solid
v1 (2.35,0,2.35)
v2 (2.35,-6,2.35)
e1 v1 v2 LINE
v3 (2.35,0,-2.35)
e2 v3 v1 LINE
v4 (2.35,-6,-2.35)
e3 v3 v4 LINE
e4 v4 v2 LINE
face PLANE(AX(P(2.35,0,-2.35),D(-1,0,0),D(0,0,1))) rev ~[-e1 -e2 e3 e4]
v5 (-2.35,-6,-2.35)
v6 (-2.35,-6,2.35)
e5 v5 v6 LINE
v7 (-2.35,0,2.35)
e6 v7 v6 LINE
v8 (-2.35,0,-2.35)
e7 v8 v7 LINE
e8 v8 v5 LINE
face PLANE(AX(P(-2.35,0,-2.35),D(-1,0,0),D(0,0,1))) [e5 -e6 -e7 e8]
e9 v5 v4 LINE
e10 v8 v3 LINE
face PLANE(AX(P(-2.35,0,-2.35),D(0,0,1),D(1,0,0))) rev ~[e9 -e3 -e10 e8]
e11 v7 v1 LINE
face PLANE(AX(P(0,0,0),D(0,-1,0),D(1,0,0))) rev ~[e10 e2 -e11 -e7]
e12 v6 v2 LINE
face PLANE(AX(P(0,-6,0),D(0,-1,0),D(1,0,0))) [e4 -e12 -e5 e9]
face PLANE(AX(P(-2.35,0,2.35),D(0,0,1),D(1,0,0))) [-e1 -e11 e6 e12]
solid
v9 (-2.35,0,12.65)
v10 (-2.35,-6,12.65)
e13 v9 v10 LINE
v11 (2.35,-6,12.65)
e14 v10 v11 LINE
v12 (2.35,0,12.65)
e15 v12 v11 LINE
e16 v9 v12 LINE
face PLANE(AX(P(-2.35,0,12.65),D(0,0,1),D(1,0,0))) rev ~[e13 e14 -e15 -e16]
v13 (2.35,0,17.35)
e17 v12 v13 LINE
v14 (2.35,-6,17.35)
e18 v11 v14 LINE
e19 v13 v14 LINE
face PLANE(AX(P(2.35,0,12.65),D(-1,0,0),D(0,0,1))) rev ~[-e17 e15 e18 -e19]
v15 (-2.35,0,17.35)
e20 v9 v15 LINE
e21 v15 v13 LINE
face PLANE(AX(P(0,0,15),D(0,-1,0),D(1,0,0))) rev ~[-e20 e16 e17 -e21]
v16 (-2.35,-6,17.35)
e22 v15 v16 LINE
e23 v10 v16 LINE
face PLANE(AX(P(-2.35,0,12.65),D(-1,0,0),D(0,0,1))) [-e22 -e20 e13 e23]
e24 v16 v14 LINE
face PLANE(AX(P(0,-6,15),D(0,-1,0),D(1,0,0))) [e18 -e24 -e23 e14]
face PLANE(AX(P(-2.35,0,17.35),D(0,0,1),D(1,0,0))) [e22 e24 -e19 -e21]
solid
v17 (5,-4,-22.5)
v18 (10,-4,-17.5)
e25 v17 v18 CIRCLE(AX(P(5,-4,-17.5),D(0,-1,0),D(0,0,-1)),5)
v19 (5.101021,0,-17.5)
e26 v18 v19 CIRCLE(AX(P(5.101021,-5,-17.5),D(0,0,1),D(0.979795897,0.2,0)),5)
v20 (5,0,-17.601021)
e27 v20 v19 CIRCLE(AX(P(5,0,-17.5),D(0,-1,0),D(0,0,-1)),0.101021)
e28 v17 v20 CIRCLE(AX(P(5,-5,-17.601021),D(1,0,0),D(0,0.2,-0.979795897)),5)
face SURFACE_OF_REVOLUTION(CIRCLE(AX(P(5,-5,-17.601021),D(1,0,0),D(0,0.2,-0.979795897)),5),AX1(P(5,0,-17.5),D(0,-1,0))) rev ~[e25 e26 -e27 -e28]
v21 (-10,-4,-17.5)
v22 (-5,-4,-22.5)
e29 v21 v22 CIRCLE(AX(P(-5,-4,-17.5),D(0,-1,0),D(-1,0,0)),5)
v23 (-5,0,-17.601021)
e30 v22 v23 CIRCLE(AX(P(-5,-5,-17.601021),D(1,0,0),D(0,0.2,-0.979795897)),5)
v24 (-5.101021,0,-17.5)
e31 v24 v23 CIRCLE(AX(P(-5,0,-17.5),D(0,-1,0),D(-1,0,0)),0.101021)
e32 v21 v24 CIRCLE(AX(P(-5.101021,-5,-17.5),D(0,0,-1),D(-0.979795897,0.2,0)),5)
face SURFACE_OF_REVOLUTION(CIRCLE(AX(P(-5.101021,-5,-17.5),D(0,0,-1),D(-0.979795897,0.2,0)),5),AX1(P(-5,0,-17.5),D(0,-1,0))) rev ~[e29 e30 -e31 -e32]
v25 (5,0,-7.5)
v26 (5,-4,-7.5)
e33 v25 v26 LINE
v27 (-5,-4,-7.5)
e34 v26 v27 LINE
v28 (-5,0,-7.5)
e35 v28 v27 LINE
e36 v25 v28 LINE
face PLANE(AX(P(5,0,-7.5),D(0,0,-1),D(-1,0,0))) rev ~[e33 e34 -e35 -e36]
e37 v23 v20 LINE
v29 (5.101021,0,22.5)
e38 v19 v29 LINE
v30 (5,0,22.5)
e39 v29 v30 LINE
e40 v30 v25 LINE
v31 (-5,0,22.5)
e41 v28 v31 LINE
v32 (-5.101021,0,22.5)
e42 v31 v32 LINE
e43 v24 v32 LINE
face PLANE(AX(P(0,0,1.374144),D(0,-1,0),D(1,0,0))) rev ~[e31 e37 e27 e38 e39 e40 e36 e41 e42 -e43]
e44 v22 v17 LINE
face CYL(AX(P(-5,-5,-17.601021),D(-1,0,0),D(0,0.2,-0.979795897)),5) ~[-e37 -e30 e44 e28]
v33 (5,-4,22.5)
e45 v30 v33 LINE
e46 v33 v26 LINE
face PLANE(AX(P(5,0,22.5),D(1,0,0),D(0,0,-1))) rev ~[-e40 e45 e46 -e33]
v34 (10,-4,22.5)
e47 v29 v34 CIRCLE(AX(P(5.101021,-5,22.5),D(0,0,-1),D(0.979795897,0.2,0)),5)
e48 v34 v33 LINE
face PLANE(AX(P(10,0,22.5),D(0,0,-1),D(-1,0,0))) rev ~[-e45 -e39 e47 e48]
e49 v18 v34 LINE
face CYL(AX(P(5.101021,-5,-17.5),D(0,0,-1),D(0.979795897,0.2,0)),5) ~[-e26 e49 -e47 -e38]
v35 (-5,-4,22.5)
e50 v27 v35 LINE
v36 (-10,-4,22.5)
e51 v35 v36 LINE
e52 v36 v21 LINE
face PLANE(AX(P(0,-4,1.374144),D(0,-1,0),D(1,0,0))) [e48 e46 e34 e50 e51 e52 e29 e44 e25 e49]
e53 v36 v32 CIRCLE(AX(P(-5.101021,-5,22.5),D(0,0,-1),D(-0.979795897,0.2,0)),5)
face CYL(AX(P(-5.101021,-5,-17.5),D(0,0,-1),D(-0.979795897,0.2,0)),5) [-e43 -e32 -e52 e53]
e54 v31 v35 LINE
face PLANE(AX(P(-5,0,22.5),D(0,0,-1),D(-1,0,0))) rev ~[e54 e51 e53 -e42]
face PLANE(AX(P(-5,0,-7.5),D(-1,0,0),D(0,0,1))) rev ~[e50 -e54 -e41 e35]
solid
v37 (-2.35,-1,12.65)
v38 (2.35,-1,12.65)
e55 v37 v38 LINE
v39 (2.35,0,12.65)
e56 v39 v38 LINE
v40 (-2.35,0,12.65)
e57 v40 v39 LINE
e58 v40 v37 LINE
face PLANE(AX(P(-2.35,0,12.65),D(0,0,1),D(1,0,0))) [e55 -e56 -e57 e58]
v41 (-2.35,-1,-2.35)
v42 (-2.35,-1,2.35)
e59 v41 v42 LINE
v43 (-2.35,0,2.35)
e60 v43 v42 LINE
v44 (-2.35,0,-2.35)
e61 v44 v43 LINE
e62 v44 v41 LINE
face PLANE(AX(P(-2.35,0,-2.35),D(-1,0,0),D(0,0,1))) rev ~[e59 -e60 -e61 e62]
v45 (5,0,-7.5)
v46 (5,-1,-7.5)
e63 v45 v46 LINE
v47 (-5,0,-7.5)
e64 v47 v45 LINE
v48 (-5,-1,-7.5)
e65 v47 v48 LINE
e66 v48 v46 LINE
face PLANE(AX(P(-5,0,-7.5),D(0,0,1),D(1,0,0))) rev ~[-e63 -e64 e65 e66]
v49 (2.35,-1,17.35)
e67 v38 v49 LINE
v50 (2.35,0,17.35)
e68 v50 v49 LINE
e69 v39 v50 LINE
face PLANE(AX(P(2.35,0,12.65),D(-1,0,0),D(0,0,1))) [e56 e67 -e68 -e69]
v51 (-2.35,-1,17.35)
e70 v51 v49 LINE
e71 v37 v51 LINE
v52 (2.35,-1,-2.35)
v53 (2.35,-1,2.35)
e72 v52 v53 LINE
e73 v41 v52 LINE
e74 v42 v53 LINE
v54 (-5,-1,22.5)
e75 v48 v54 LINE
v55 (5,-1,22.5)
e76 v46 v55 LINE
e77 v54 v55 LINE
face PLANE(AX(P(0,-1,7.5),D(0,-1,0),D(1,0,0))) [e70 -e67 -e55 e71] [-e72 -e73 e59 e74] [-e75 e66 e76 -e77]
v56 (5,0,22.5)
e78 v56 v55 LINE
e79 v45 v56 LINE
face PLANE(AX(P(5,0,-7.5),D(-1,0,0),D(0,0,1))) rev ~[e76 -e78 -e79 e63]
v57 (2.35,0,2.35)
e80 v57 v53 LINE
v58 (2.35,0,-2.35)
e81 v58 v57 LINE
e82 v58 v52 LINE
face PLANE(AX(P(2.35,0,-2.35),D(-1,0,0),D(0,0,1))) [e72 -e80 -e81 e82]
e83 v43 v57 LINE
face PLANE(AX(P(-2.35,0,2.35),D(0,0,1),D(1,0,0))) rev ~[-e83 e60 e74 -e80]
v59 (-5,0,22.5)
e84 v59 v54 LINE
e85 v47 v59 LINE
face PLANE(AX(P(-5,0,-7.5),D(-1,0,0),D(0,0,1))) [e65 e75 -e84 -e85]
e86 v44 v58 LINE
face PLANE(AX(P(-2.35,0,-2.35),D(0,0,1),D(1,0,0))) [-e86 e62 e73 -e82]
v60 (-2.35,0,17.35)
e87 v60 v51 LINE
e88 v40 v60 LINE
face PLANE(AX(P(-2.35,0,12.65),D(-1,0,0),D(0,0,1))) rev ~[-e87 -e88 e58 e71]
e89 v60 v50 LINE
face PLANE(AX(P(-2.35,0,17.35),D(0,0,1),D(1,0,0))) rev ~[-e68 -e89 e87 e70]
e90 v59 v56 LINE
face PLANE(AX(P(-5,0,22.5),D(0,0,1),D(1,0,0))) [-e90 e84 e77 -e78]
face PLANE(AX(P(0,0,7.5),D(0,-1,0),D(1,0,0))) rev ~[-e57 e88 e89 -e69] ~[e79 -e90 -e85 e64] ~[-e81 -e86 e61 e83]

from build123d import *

# Parameters (mm, degrees)
F1_DEPTH    = 4
F2_T1_DEPTH = 52.2474487139
F2_T3_DEPTH = 10
F2_T6_ANGLE = 90
F2_T8_ANGLE = 90
F0_W        = 4.7
F0_H        = 4.7
F3_DEPTH    = 6
F0_W_2      = 10
F0_H_2      = 30
F4_DEPTH    = 1


# Not quite as in the source:
# - a fillet or chamfer that OpenCascade refuses, or shapes differently, is made with other operations: its cross-section is extruded or revolved along the edge and cut away or added


with BuildPart() as f1:
    # F0 (on Front) → F1 (new body)
    with BuildSketch(Plane.XZ):
        with BuildLine():
            ThreePointArc((-10, -17.5), (-8.5355339059, -21.0355339059), (-5, -22.5))
            Line((-5, -22.5), (5, -22.5))
            ThreePointArc((5, -22.5), (8.5355339059, -21.0355339059), (10, -17.5))
            Line((10, -17.5), (10, 22.5))
            Line((10, 22.5), (5, 22.5))
            Line((5, 22.5), (5, -7.5))
            Line((5, -7.5), (-5, -7.5))
            Line((-5, -7.5), (-5, 22.5))
            Line((-5, 22.5), (-10, 22.5))
            Line((-10, 22.5), (-10, -17.5))
        make_face()
    extrude(amount=F1_DEPTH)

    # F2: fillet of radius 5 on 1 edges, made by hand

    # F2_s2 → F2_t1 (cut)
    with BuildSketch(Plane.XY.offset(-17.5)):
        with BuildLine():
            ThreePointArc((10, -4), (8.2632981746, -1.1270166538), (5.1010205144, 0))
            Line((5.1010205144, 0), (10, 0))
            Line((10, 0), (10, -4))
        make_face()
        with BuildLine():
            ThreePointArc((-10, -4), (-8.2632981746, -1.1270166538), (-5.1010205144, 0))
            Line((-5.1010205144, 0), (-10, 0))
            Line((-10, 0), (-10, -4))
        make_face()
    extrude(amount=F2_T1_DEPTH, mode=Mode.SUBTRACT)

    # F2_s4 → F2_t3 (cut)
    with BuildSketch(Plane.YZ.offset(-5)):
        with BuildLine():
            ThreePointArc((-4, -22.5), (-1.1270166538, -20.7632981746), (0, -17.6010205144))
            Line((0, -17.6010205144), (0, -22.5))
            Line((0, -22.5), (-4, -22.5))
        make_face()
    extrude(amount=F2_T3_DEPTH, mode=Mode.SUBTRACT)

    # F2_s5 → F2_t6 (revolve, cut)
    with BuildSketch(Plane.YZ.offset(5)):
        with BuildLine():
            ThreePointArc((-4, -22.5), (-1.1270166538, -20.7632981746), (0, -17.6010205144))
            Line((0, -17.6010205144), (0, -22.5))
            Line((0, -22.5), (-4, -22.5))
        make_face()
    revolve(axis=Axis((5, 0, -17.5), (0, -1, 0)), revolution_arc=F2_T6_ANGLE, mode=Mode.SUBTRACT)

    # F2_s7 → F2_t8 (revolve, cut)
    with BuildSketch(Plane.XY.offset(-17.5)):
        with BuildLine():
            ThreePointArc((-10, -4), (-8.2632981746, -1.1270166538), (-5.1010205144, 0))
            Line((-5.1010205144, 0), (-10, 0))
            Line((-10, 0), (-10, -4))
        make_face()
    revolve(axis=Axis((-5, 0, -17.5), (0, -1, 0)), revolution_arc=F2_T8_ANGLE, mode=Mode.SUBTRACT)


with BuildPart() as f3:
    # F0 (on Front) → F3 (new body)
    with BuildSketch(Plane.XZ):
        Rectangle(F0_W, F0_H)
    extrude(amount=F3_DEPTH)


with BuildPart() as f3b:
    # F0 (on Front) → F3, piece 2 (new body)
    with BuildSketch(Plane.XZ):
        with Locations((0, 15)):
            Rectangle(F0_W, F0_H)
    extrude(amount=F3_DEPTH)


with BuildPart() as f4:
    # F0 (on Front) → F4 (new body)
    with BuildSketch(Plane.XZ):
        with Locations((0, 7.5)):
            Rectangle(F0_W_2, F0_H_2)
        Rectangle(F0_W, F0_H, mode=Mode.SUBTRACT)
        with Locations((0, 15)):
            Rectangle(F0_W, F0_H, mode=Mode.SUBTRACT)
    extrude(amount=F4_DEPTH)


solid = Compound([f1.part, f3.part, f3b.part, f4.part])
